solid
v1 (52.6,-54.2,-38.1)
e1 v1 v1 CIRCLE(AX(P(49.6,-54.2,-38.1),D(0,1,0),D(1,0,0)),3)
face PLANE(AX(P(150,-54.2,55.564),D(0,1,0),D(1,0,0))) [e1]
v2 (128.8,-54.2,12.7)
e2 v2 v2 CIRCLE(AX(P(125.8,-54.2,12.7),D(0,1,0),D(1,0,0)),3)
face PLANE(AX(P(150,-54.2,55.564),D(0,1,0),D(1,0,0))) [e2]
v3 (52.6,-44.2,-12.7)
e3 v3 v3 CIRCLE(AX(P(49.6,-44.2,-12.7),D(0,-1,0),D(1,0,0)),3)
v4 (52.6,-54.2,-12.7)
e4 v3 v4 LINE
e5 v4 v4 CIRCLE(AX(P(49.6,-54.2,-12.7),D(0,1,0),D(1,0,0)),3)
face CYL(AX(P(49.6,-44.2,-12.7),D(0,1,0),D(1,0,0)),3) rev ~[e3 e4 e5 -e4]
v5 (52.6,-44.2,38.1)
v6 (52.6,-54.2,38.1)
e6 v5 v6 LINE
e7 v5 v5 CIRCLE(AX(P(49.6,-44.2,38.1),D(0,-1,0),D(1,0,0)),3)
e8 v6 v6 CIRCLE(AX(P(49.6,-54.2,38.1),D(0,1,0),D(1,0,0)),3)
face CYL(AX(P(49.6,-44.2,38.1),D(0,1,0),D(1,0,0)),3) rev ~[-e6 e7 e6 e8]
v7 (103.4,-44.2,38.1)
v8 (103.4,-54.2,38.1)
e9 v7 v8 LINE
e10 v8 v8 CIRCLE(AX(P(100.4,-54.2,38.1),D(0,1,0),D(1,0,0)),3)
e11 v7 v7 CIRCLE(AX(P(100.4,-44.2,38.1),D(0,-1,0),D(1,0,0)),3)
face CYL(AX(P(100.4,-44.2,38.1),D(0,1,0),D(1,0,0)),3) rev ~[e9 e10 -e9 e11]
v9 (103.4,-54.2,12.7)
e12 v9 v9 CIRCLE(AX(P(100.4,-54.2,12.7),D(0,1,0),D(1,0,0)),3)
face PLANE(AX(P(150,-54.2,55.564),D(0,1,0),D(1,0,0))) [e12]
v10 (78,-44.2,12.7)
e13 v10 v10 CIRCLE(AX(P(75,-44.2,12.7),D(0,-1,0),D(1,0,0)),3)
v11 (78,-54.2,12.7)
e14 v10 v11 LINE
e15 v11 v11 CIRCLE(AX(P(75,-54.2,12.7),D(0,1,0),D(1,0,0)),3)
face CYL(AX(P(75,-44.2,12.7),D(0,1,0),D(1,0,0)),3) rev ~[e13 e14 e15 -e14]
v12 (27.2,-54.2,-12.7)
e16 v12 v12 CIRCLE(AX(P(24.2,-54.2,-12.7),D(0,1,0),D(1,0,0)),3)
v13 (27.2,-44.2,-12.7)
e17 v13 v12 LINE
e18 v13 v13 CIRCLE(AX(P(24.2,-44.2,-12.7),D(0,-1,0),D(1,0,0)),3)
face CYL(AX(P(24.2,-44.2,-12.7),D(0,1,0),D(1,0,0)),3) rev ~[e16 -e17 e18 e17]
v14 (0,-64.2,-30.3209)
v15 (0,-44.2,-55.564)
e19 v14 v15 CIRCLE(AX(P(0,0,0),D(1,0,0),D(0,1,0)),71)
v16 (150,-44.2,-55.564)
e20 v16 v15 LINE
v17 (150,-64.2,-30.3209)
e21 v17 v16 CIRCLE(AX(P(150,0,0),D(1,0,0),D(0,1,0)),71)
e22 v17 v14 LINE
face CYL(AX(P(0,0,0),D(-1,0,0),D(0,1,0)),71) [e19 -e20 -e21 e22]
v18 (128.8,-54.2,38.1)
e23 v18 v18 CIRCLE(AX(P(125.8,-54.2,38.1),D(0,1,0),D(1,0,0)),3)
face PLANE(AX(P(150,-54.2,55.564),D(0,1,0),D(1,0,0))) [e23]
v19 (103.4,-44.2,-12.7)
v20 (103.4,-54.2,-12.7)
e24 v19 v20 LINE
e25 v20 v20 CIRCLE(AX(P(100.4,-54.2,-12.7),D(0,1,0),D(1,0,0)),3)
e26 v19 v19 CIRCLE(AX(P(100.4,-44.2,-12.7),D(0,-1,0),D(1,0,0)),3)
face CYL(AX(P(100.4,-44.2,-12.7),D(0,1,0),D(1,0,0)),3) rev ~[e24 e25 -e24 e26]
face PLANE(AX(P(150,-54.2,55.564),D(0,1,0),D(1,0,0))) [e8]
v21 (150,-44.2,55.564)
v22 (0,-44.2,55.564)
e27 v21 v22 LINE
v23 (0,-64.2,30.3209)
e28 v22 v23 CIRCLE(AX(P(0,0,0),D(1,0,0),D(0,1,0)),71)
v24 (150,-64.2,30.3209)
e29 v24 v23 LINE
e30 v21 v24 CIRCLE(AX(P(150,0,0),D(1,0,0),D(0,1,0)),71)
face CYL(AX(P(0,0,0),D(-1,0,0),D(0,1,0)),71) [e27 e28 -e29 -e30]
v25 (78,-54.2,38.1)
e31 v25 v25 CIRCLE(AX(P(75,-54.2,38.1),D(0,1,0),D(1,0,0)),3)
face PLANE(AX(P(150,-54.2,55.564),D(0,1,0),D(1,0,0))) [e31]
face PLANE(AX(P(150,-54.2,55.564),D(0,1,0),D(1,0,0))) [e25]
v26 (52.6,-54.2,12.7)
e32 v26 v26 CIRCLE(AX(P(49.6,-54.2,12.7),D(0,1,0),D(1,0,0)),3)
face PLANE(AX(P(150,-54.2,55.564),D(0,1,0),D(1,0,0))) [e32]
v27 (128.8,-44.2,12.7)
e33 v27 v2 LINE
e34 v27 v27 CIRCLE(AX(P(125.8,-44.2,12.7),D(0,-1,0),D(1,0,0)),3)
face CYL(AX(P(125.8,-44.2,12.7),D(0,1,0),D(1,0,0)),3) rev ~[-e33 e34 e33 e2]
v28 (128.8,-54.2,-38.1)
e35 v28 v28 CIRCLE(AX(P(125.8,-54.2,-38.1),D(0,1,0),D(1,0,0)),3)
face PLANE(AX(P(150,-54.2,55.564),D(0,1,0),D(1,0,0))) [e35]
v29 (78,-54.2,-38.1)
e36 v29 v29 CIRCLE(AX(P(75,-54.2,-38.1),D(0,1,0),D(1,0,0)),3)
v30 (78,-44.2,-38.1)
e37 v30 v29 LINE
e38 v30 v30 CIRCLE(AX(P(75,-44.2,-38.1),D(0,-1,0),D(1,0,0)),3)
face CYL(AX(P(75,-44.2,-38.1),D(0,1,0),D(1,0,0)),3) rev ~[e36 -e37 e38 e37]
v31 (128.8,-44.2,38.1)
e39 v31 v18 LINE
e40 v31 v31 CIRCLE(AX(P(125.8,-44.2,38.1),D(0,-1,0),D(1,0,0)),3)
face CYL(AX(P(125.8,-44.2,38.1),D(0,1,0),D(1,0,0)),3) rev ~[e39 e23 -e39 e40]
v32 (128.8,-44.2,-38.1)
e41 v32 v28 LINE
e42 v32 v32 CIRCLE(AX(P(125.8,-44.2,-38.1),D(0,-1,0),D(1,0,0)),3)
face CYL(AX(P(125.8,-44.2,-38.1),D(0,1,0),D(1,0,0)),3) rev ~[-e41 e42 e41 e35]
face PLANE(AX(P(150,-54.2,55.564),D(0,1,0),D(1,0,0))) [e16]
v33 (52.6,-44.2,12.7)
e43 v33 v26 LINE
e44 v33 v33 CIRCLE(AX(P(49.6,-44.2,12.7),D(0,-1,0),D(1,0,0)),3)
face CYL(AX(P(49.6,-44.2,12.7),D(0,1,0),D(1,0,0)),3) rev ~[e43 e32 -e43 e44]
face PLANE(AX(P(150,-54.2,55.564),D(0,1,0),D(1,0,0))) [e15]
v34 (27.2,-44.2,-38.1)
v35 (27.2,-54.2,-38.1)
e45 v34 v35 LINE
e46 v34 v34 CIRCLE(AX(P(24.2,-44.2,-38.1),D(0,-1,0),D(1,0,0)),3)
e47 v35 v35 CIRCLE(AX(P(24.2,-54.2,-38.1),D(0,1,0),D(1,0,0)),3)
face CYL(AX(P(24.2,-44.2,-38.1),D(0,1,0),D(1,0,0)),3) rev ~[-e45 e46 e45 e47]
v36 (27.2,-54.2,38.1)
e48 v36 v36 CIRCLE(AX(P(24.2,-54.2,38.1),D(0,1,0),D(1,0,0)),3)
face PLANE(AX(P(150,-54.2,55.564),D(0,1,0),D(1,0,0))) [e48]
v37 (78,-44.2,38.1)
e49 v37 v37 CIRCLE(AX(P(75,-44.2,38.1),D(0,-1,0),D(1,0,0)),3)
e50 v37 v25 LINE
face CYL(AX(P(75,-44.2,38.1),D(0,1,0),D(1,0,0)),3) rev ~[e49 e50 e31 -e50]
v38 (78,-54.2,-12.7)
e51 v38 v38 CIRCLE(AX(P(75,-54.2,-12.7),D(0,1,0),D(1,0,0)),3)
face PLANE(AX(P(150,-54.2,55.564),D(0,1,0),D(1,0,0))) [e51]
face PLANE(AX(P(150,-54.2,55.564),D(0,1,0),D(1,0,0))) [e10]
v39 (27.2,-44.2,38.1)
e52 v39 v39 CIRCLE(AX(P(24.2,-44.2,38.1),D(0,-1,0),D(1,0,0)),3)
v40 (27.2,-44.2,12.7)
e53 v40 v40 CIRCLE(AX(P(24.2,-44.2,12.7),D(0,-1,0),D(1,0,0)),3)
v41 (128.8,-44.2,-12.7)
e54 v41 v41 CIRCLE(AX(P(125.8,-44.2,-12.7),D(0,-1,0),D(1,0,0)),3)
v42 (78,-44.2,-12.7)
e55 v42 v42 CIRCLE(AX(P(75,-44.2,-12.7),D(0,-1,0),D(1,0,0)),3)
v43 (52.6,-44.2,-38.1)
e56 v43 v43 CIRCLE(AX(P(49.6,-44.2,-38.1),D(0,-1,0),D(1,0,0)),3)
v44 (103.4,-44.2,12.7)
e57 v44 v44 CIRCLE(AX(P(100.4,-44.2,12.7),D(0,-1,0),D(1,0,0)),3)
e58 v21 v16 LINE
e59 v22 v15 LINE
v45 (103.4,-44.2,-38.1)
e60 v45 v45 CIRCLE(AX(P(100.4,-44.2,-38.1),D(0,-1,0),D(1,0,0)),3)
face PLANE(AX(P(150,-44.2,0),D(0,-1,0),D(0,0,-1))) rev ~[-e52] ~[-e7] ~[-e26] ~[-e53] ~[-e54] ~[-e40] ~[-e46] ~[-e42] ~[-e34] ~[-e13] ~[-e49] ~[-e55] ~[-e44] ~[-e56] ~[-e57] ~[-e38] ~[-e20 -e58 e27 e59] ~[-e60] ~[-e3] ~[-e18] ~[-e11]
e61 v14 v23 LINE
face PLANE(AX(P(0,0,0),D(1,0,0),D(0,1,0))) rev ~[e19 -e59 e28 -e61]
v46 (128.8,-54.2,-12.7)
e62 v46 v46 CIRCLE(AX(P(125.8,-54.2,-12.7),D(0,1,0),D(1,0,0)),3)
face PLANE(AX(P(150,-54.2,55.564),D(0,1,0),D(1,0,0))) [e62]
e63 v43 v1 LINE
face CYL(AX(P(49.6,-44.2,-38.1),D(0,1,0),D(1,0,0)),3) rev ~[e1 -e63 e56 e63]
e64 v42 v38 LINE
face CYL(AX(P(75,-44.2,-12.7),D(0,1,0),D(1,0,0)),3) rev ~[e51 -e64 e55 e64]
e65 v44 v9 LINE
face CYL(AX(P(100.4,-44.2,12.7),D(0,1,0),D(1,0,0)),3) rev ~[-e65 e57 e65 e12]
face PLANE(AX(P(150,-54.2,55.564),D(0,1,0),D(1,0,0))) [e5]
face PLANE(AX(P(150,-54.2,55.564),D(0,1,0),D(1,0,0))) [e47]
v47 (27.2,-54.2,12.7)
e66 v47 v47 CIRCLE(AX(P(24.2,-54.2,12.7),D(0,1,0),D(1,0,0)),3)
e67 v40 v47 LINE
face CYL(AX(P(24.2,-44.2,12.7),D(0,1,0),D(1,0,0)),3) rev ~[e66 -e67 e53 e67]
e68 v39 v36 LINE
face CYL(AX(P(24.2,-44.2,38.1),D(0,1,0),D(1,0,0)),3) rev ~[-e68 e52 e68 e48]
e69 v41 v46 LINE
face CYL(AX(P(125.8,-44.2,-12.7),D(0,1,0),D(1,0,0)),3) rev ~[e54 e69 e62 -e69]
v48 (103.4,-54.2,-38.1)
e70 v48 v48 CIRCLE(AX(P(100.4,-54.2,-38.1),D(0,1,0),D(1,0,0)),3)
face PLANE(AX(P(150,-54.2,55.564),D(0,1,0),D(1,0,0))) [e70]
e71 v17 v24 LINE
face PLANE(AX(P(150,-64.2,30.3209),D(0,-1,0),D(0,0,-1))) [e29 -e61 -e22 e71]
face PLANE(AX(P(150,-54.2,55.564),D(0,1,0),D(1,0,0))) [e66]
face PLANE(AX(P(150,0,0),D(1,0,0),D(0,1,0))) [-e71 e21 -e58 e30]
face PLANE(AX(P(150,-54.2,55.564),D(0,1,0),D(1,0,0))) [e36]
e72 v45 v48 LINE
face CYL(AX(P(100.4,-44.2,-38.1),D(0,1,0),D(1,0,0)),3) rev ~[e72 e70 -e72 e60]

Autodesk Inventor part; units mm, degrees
ref_plane "YZ Plane" through (0, 0, 0) normal (1, 0, 0) x (0, 1, 0)
ref_plane "XZ Plane" through (0, 0, 0) normal (0, 1, 0) x (-1, 0, 0)
ref_plane "XY Plane" through (0, 0, 0) normal (0, 0, 1) x (1, 0, 0)
sketch "Sketch1" plane through (0, 0, 0) normal (1, 0, 0) x (0, 1, 0)
  circle A0 centre (0, 0) radius 71
  dimension "d0" = 142
extrude "Extrusion1" add sketch "Sketch1" along normal blind 150
sketch "Sketch2" plane through (150, 0, 0) normal (1, 0, 0) x (0, 0, -1)
  line L0 (0, 0) -> (0, -44.2)
  circle A0 centre (0, 0) radius 71 projected
  line L1 (-55.564, -44.2) -> (55.564, -44.2)
  dimension "d3" = 44.2
extrude "Extrusion2" cut sketch "Sketch2" against normal blind 150 contours A0 L1 picked at (-0.2063, 32.437)
sketch "Sketch3" plane through (150, 0, 0) normal (1, 0, 0) x (0, 0, -1)
  line L0 (0, 0) -> (0, -64.2)
  arc A0 (-55.564, -44.2) -> (55.564, -44.2) centre (0, 0) ccw projected
  line L1 (-30.3209, -64.2) -> (30.3209, -64.2)
  dimension "d6" = 64.2
sketch "Sketch5" plane through (150, -44.2, 55.564) normal (0, 1, 0) x (1, 0, 0)
  line L0 (-150, 55.564) -> (-75, 55.564)
  line L1 (-75, 55.564) -> (-75, 68.264)
  line L2 (-75, 55.564) -> (-75, 42.864)
  circle A0 centre (-75, 68.264) radius 3
  circle A1 centre (-75, 42.864) radius 3
  line L3 (-75, 68.264) -> (-49.6, 68.264)
  line L4 (-75, 42.864) -> (-49.6, 42.864)
  line L5 (-75, 68.264) -> (-100.4, 68.264)
  line L6 (-75, 42.864) -> (-100.4, 42.864)
  circle A2 centre (-100.4, 68.264) radius 3
  circle A3 centre (-49.6, 68.264) radius 3
  circle A4 centre (-49.6, 42.864) radius 3
  circle A5 centre (-100.4, 42.864) radius 3
  line L7 (-100.4, 42.864) -> (-125.8, 42.864)
  line L8 (-100.4, 68.264) -> (-125.8, 68.264)
  line L9 (-49.6, 68.264) -> (-24.2, 68.264)
  line L10 (-49.6, 42.864) -> (-24.2, 42.864)
  circle A6 centre (-125.8, 68.264) radius 3
  circle A7 centre (-125.8, 42.864) radius 3
  circle A8 centre (-24.2, 68.264) radius 3
  circle A9 centre (-24.2, 42.864) radius 3
  line L11 (-125.8, 68.264) -> (-125.8, 93.664)
  line L12 (-100.4, 68.264) -> (-100.4, 93.664)
  line L13 (-75, 68.264) -> (-75, 93.664)
  line L14 (-75, 68.264) -> (-49.6, 68.264) construction
  line L15 (-49.6, 68.264) -> (-49.6, 93.664)
  line L16 (-24.2, 68.264) -> (-24.2, 93.664)
  line L17 (-125.8, 42.864) -> (-125.8, 17.464)
  line L18 (-100.4, 42.864) -> (-100.4, 17.464)
  line L19 (-75, 42.864) -> (-75, 17.464)
  line L20 (-49.6, 42.864) -> (-49.6, 17.464)
  line L21 (-24.2, 42.864) -> (-24.2, 17.464)
  circle A10 centre (-125.8, 93.664) radius 3
  circle A11 centre (-100.4, 93.664) radius 3
  circle A12 centre (-75, 93.664) radius 3
  circle A13 centre (-49.6, 93.664) radius 3
  circle A14 centre (-24.2, 93.664) radius 3
  circle A15 centre (-24.2, 17.464) radius 3
  circle A16 centre (-49.6, 17.464) radius 3
  circle A17 centre (-75, 17.464) radius 3
  circle A18 centre (-100.4, 17.464) radius 3
  circle A19 centre (-125.8, 17.464) radius 3
  dimension "d9" = 75
  dimension "d10" = 12.7
  dimension "d11" = 12.7
  dimension "d12" = 6
  dimension "d13" = 6
  dimension "d14" = 25.4
  dimension "d15" = 25.4
  dimension "d16" = 25.4
  dimension "d17" = 25.4
  dimension "d18" = 6
  dimension "d19" = 6
  dimension "d20" = 6
  dimension "d21" = 6
  dimension "d22" = 25.4
  dimension "d23" = 25.4
  dimension "d24" = 25.4
  dimension "d25" = 25.4
  dimension "d26" = 6
  dimension "d27" = 6
  dimension "d28" = 6
  dimension "d29" = 6
  dimension "d30" = 25.4
  dimension "d31" = 25.4
  dimension "d32" = 25.4
  dimension "d33" = 90
  dimension "d34" = 25.4
  dimension "d35" = 25.4
  dimension "d36" = 25.4
  dimension "d37" = 25.4
  dimension "d38" = 25.4
  dimension "d39" = 25.4
  dimension "d40" = 25.4
  dimension "d41" = 6
  dimension "d42" = 6
  dimension "d43" = 6
  dimension "d44" = 6
  dimension "d45" = 6
  dimension "d46" = 6
  dimension "d47" = 6
  dimension "d48" = 6
  dimension "d49" = 6
  dimension "d50" = 6
sketch "Sketch6" plane through (150, 0, 0) normal (1, 0, 0) x (0, 0, -1)
  point P0 (0, 0)
extrude "Extrusion4" cut sketch "Sketch3" against normal blind 150
extrude "Extrusion5" cut sketch "Sketch5" against normal blind 10
thread "Thread1" size "M6x1" class "6H" standard "ANSI Metric M Profile" full length
thread "Thread2" size "M6x1" class "6H" standard "ANSI Metric M Profile" full length
thread "Thread3" size "M6x1" class "6H" standard "ANSI Metric M Profile" full length
thread "Thread4" size "M6x1" class "6H" standard "ANSI Metric M Profile" full length
thread "Thread5" size "M6x1" class "6H" standard "ANSI Metric M Profile" full length
thread "Thread6" size "M6x1" class "6H" standard "ANSI Metric M Profile" full length
thread "Thread7" size "M6x1" class "6H" standard "ANSI Metric M Profile" full length
thread "Thread8" size "M6x1" class "6H" standard "ANSI Metric M Profile" full length
thread "Thread9" size "M6x1" class "6H" standard "ANSI Metric M Profile" full length
thread "Thread10" size "M6x1" class "6H" standard "ANSI Metric M Profile" full length
thread "Thread11" size "M6x1" class "6H" standard "ANSI Metric M Profile" full length
thread "Thread12" size "M6x1" class "6H" standard "ANSI Metric M Profile" full length
thread "Thread13" size "M6x1" class "6H" standard "ANSI Metric M Profile" full length
thread "Thread14" size "M6x1" class "6H" standard "ANSI Metric M Profile" full length
thread "Thread15" size "M6x1" class "6H" standard "ANSI Metric M Profile" full length
thread "Thread16" size "M6x1" class "6H" standard "ANSI Metric M Profile" full length
thread "Thread17" size "M6x1" class "6H" standard "ANSI Metric M Profile" full length
thread "Thread18" size "M6x1" class "6H" standard "ANSI Metric M Profile" full length
thread "Thread19" size "M6x1" class "6H" standard "ANSI Metric M Profile" full length
thread "Thread20" size "M6x1" class "6H" standard "ANSI Metric M Profile" full length
properties part number "Base"
